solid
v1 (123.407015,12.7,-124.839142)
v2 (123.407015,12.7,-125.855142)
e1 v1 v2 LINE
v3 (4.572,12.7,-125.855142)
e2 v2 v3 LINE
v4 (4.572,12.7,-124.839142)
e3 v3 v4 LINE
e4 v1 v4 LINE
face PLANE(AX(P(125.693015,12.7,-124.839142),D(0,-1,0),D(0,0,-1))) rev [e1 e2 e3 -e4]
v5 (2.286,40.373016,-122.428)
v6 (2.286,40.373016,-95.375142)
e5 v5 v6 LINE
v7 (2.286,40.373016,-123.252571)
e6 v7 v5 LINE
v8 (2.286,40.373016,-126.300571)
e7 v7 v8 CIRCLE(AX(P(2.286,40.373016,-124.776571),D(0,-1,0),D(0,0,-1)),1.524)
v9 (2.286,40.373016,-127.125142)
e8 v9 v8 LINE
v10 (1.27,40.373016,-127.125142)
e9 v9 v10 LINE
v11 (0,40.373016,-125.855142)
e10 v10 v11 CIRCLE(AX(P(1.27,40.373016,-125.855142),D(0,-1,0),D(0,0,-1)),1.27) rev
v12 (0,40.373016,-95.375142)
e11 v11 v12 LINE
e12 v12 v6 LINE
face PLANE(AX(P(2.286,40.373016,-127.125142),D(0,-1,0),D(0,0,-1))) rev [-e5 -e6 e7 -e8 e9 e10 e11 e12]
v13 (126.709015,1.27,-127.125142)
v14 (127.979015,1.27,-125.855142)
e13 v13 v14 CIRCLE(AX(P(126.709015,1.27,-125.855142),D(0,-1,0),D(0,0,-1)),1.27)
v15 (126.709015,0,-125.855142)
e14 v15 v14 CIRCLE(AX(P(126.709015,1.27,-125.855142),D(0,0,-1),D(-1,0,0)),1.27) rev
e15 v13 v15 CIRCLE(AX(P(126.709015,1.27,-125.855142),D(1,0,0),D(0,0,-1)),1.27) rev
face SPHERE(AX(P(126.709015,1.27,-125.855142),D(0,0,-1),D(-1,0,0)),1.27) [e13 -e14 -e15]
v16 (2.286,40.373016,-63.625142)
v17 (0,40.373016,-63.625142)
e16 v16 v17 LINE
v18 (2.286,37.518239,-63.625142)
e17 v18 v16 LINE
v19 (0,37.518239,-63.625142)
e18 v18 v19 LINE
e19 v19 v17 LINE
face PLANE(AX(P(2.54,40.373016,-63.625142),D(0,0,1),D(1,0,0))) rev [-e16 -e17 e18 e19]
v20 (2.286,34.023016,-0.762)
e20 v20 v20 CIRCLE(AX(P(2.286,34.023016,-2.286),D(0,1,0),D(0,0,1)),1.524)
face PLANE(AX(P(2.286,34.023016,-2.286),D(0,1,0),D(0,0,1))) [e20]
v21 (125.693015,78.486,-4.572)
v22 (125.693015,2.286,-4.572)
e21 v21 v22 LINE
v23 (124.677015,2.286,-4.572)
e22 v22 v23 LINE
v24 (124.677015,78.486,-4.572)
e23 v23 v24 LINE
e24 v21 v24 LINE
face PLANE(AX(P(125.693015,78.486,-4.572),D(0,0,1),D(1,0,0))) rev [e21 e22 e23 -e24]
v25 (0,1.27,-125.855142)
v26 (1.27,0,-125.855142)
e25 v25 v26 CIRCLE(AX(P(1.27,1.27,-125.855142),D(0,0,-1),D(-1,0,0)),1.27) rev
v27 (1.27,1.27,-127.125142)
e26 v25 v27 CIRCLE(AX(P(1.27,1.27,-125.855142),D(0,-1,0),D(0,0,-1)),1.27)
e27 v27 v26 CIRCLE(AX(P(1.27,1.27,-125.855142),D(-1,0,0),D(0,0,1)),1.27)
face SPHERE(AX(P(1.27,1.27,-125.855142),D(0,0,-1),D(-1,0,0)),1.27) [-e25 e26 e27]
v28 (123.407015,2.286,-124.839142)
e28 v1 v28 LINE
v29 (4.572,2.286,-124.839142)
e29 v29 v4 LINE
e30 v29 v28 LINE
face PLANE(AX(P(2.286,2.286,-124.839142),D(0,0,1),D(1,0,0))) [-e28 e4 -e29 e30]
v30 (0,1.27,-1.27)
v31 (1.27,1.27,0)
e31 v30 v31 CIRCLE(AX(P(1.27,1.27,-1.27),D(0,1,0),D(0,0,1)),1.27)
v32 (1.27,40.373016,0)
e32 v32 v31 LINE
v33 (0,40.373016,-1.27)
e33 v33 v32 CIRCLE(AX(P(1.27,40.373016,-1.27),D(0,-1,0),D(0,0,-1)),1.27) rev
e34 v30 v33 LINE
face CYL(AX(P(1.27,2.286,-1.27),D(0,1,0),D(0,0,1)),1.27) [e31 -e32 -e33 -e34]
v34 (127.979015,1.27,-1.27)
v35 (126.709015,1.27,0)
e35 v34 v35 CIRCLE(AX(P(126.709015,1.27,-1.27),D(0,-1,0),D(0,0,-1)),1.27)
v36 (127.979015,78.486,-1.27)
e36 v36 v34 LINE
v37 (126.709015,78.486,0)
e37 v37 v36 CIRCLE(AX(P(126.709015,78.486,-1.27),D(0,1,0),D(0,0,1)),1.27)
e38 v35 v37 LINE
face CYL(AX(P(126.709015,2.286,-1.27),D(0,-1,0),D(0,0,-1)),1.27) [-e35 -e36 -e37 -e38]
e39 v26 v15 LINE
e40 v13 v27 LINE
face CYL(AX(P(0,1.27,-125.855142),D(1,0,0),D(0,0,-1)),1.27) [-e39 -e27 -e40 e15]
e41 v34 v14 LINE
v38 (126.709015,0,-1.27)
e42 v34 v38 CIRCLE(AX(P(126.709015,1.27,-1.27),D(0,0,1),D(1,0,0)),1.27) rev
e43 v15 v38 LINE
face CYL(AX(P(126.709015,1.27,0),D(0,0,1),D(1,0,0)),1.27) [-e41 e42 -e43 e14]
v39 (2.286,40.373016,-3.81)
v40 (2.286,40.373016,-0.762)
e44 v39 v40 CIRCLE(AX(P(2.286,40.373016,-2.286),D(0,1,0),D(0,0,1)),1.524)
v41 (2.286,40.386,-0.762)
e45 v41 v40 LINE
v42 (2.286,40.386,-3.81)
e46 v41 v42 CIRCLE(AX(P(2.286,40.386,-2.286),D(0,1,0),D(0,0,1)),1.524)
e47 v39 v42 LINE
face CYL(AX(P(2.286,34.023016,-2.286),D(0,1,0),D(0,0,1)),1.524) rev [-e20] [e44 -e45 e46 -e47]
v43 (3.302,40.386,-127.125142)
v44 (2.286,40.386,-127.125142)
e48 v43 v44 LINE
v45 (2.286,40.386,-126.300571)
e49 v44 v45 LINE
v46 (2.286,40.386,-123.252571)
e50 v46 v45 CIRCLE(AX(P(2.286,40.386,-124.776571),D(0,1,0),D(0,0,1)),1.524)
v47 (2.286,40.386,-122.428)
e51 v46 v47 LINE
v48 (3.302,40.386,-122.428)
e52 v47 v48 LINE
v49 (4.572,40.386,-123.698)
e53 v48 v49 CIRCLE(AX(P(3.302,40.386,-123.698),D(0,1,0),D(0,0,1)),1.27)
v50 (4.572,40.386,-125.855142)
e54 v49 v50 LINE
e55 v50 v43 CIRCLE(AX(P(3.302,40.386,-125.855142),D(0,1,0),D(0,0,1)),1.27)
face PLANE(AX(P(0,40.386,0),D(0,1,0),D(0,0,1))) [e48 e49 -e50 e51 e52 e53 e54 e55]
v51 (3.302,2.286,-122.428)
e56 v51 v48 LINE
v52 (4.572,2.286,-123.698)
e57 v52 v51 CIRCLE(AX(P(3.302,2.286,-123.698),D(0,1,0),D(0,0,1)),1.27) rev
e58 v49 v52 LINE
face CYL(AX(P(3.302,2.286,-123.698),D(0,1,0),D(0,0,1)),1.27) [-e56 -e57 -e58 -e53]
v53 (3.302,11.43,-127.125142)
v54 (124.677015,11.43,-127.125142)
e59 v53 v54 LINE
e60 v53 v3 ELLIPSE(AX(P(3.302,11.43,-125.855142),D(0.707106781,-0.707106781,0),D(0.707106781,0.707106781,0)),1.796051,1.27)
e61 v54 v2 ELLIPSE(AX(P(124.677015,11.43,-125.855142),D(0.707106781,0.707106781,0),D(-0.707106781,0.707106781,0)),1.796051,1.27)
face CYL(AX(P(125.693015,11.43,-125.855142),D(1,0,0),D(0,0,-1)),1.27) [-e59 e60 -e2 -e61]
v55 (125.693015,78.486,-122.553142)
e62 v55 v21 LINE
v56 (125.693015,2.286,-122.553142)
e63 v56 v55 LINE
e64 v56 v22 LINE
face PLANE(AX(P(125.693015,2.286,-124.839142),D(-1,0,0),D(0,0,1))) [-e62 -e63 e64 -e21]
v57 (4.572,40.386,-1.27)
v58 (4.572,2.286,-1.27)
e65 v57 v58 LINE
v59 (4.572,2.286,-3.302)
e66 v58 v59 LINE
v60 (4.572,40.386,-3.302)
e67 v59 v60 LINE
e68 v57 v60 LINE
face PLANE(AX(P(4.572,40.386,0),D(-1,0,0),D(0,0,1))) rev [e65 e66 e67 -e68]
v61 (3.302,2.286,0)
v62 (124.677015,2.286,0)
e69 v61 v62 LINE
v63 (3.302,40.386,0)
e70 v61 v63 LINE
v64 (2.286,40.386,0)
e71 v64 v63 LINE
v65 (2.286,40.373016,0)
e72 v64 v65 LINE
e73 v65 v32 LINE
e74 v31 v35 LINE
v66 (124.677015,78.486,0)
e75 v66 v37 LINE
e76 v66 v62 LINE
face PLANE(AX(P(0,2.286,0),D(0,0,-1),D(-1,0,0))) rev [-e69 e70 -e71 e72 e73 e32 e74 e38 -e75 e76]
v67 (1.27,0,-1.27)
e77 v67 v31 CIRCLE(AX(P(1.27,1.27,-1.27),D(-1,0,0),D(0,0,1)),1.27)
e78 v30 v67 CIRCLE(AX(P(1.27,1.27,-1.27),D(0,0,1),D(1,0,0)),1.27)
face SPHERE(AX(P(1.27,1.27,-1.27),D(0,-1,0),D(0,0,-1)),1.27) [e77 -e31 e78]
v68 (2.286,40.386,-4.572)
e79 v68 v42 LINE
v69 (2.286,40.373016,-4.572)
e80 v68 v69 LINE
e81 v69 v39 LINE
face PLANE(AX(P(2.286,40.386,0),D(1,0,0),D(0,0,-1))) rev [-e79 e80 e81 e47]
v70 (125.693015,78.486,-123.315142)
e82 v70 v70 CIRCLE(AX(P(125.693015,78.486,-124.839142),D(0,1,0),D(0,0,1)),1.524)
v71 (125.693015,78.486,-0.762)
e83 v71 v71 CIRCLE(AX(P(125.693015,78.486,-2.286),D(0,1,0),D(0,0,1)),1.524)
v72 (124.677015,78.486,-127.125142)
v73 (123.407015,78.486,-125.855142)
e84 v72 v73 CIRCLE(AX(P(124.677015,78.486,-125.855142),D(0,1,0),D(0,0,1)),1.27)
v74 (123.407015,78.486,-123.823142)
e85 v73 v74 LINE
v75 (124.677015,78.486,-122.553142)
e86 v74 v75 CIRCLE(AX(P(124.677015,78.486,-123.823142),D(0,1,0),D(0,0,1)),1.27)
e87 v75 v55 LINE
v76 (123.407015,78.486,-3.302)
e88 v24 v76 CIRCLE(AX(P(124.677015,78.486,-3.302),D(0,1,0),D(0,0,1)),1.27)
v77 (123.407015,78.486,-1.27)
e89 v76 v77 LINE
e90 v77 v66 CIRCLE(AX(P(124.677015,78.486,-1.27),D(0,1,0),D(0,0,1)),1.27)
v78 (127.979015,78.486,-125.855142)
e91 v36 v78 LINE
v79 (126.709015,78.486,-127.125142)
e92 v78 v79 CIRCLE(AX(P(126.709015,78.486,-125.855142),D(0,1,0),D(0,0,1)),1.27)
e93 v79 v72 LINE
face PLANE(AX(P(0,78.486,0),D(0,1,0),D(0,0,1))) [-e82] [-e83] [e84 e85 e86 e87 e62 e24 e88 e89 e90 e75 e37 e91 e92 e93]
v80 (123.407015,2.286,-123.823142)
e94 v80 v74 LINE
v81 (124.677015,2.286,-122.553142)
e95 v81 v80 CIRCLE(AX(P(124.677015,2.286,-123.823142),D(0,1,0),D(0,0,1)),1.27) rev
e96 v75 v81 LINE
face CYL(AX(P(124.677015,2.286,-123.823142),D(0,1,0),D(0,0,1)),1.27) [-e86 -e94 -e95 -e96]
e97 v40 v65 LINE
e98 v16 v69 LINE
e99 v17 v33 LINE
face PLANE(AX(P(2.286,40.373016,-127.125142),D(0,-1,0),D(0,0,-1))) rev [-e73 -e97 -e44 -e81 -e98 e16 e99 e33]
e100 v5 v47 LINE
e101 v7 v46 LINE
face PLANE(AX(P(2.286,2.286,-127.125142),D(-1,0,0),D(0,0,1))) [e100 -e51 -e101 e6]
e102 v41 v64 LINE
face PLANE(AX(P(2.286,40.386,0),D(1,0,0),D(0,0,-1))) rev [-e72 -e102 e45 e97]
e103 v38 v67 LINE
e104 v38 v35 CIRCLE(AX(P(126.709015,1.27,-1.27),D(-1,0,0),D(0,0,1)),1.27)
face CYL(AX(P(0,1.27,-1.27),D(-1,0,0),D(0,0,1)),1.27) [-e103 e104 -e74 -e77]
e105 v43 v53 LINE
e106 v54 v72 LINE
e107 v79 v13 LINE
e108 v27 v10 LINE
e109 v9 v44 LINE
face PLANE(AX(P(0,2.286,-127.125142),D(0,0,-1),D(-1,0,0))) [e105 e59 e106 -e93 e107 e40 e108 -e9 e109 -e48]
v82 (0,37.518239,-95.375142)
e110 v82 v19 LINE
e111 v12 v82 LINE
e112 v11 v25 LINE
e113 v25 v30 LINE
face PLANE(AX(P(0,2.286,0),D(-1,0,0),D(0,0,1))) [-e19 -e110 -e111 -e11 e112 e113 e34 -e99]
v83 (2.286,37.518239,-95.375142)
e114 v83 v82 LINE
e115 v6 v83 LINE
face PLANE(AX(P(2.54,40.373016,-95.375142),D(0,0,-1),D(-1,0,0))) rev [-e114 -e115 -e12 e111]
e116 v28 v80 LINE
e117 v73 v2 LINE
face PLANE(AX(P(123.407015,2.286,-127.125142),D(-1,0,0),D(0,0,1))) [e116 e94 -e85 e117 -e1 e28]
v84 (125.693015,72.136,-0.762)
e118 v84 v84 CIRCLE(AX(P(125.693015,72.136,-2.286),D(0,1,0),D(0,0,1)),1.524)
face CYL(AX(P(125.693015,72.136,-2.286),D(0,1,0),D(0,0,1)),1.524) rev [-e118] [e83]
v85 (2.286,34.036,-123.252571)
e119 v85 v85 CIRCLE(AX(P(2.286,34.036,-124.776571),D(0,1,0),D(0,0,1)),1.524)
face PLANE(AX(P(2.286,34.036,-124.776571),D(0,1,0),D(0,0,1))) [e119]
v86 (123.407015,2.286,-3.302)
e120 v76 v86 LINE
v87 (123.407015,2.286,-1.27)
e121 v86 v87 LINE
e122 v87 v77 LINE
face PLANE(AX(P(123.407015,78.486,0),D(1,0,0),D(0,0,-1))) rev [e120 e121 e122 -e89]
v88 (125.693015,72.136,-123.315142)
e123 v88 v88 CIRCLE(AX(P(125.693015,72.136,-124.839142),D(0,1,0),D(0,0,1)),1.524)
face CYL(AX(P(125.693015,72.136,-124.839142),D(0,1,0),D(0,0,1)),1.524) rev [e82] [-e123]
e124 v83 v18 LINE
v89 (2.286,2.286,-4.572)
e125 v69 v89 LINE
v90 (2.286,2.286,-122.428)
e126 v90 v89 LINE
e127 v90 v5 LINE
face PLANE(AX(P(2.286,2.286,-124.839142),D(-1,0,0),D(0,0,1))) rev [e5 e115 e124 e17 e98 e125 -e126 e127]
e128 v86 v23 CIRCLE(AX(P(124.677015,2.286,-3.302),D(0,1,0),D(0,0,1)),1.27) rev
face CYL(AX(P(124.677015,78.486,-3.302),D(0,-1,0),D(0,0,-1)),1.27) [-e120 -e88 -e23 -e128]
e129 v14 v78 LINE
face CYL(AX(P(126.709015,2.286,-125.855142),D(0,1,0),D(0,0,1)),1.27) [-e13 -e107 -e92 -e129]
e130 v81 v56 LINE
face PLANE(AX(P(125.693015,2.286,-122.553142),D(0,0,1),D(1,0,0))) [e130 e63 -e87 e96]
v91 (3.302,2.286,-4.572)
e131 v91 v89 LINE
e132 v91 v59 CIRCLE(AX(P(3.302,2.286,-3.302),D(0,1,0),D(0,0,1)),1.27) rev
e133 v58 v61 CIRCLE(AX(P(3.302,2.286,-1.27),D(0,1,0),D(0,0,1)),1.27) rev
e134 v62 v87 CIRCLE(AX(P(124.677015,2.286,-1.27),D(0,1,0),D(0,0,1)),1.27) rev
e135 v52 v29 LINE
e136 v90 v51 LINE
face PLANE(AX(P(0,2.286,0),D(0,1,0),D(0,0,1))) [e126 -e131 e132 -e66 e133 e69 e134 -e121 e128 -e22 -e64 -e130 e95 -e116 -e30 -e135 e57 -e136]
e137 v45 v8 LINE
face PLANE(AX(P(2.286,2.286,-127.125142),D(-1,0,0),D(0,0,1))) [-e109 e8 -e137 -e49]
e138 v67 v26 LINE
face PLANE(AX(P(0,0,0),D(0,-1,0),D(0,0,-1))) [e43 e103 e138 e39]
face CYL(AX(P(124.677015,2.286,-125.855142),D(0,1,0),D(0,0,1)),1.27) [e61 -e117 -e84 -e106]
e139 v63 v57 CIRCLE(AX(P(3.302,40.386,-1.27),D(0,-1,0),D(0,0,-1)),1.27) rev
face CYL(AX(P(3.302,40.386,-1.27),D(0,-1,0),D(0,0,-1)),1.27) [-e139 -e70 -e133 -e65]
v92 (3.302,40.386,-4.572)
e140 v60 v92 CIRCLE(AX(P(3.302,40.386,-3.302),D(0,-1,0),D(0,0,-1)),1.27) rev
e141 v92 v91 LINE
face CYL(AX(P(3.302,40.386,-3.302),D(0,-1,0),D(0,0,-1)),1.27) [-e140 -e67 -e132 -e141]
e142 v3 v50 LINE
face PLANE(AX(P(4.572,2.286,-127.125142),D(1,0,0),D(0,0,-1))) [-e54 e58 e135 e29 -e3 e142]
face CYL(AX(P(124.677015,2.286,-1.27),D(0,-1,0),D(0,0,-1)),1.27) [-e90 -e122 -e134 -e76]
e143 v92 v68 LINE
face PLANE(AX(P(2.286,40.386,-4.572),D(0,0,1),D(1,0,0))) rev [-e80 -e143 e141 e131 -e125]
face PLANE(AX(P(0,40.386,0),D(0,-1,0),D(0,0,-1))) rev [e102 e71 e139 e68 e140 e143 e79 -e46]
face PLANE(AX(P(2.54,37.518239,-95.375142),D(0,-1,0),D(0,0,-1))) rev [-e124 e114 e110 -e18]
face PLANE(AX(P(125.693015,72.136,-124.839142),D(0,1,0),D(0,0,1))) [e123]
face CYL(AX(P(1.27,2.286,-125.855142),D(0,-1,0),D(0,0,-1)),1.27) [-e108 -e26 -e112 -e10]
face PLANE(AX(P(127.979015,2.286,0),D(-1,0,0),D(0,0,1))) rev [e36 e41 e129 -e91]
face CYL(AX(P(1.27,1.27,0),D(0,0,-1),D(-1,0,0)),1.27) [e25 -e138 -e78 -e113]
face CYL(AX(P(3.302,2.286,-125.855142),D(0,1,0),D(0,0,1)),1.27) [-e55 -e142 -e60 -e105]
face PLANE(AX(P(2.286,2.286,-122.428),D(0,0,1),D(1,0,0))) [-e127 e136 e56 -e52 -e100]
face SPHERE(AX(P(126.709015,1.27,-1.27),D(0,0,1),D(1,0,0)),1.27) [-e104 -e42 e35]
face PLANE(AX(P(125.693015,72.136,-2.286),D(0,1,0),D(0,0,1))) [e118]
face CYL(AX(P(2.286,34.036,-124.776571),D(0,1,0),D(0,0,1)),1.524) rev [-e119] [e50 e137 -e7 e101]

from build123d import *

# Parameters (mm, degrees)
SKETCH1_W                = 127.979014886
SKETCH1_H                = 127.125142163
BOSS_EXTRUDE1_DEPTH      = 2.286
SKETCH2_W                = 127.979014886
SKETCH2_H                = 127.125142163
BOSS_EXTRUDE2_DEPTH      = 76.2
SKETCH4_W                = 123.407014886
SKETCH4_H                = 122.553142163
CUT_EXTRUDE2_DEPTH       = 76.2
SKETCH5_W                = 123.407014886
SKETCH5_H                = 76.2
CUT_EXTRUDE3_DEPTH       = 2.286
SKETCH6_W                = 123.407014886
SKETCH6_H                = 65.786
CUT_EXTRUDE4_DEPTH       = 2.286
SKETCH7_W                = 127.125142163
SKETCH7_H                = 38.112983868
CUT_EXTRUDE5_DEPTH       = 2.286
SKETCH8_W                = 31.75
SKETCH8_H                = 2.854777597
CUT_EXTRUDE6_DEPTH       = 2.54
SKETCH9_W                = 2.286
SKETCH9_H                = 4.572
BOSS_EXTRUDE3_DEPTH      = 76.2
SKETCH11_W               = 2.286
SKETCH11_H               = 4.572
BOSS_EXTRUDE5_DEPTH      = 38.1
BOSS_EXTRUDE6_DEPTH      = 27.686
BOSS_EXTRUDE6_DEPTH_BACK = 10.414
SKETCH12_W               = 2.286
SKETCH12_H               = 4.697142163
BOSS_EXTRUDE7_DEPTH      = 65.786
BOSS_EXTRUDE7_DEPTH_BACK = 10.414
SKETCH13_W               = 2.286
SKETCH13_H               = 4.572
SKETCH14_R               = 1.524
CUT_EXTRUDE7_DEPTH       = 6.35
SKETCH15_R               = 1.524
CUT_EXTRUDE8_DEPTH       = 6.35
SKETCH16_R               = 1.524
CUT_EXTRUDE9_DEPTH       = 6.35
SKETCH18_R               = 1.524
CUT_EXTRUDE10_DEPTH      = 6.35
SKETCH19_R               = 1.524
CUT_EXTRUDE11_DEPTH      = 6.35
FILLET1_R                = 1.27
FILLET2_R                = 1.27
FILLET7_R                = 1.27
FILLET8_R                = 1.27


with BuildPart() as part:
    # Sketch1 → Boss-Extrude1 (new body)
    with BuildSketch(Plane(origin=(0, 0, 0), x_dir=(1, 0, 0), z_dir=(0, 1, 0))):
        with Locations((63.989507443, 63.562571082)):
            Rectangle(SKETCH1_W, SKETCH1_H)
    extrude(amount=BOSS_EXTRUDE1_DEPTH)

    # Sketch2 → Boss-Extrude2 (add)
    with BuildSketch(Plane(origin=(0, 2.286, 0), x_dir=(1, 0, 0), z_dir=(0, 1, 0))):
        with Locations((63.989507443, 63.562571082)):
            Rectangle(SKETCH2_W, SKETCH2_H)
    extrude(amount=BOSS_EXTRUDE2_DEPTH)

    # Sketch4 → Cut-Extrude2 (cut)
    with BuildSketch(Plane(origin=(0, 78.486, 0), x_dir=(1, 0, 0), z_dir=(0, 1, 0))):
        with Locations((63.989507443, 63.562571082)):
            Rectangle(SKETCH4_W, SKETCH4_H)
    extrude(amount=-CUT_EXTRUDE2_DEPTH, mode=Mode.SUBTRACT)

    # Sketch5 → Cut-Extrude3 (cut)
    with BuildSketch(Plane.XY):
        with Locations((63.989507443, 40.386)):
            Rectangle(SKETCH5_W, SKETCH5_H)
    extrude(amount=-CUT_EXTRUDE3_DEPTH, mode=Mode.SUBTRACT)

    # Sketch6 → Cut-Extrude4 (cut)
    with BuildSketch(Plane(origin=(0, 0, -127.125142163), x_dir=(-1, 0, 0), z_dir=(0, 0, -1))):
        with Locations((-63.989507443, 45.593)):
            Rectangle(SKETCH6_W, SKETCH6_H)
    extrude(amount=-CUT_EXTRUDE4_DEPTH, mode=Mode.SUBTRACT)

    # Sketch7 → Cut-Extrude5 (cut)
    with BuildSketch(Plane.ZY):
        with Locations((-63.562571082, 59.429508066)):
            Rectangle(SKETCH7_W, SKETCH7_H)
    extrude(amount=-CUT_EXTRUDE5_DEPTH, mode=Mode.SUBTRACT)

    # Sketch8 → Cut-Extrude6 (cut)
    with BuildSketch(Plane.ZY):
        with Locations((-79.500142163, 38.945627333)):
            Rectangle(SKETCH8_W, SKETCH8_H)
    extrude(amount=-CUT_EXTRUDE6_DEPTH, mode=Mode.SUBTRACT)

    # Sketch9 → Boss-Extrude3 (add)
    with BuildSketch(Plane(origin=(0, 2.286, 0), x_dir=(1, 0, 0), z_dir=(0, 1, 0))):
        with Locations((124.550014886, 2.286)):
            Rectangle(SKETCH9_W, SKETCH9_H)
    extrude(amount=BOSS_EXTRUDE3_DEPTH)

    # Sketch11 → Boss-Extrude5 (add)
    with BuildSketch(Plane(origin=(0, 2.286, 0), x_dir=(1, 0, 0), z_dir=(0, 1, 0))):
        with Locations((3.429, 2.286)):
            Rectangle(SKETCH11_W, SKETCH11_H)
    extrude(amount=BOSS_EXTRUDE5_DEPTH)

    # Sketch12 → Boss-Extrude6 (add, two sides: drawn at the far end of the back side and taken through both)
    with BuildSketch(Plane(origin=(0, 12.7, 0), x_dir=(1, 0, 0), z_dir=(0, 1, 0)).offset(-BOSS_EXTRUDE6_DEPTH_BACK)):
        with Locations((3.429, 124.776571082)):
            Rectangle(SKETCH12_W, SKETCH12_H)
    extrude(amount=BOSS_EXTRUDE6_DEPTH + BOSS_EXTRUDE6_DEPTH_BACK)

    # Sketch13 → Boss-Extrude7 (add, two sides: drawn at the far end of the back side and taken through both)
    with BuildSketch(Plane(origin=(0, 12.7, 0), x_dir=(1, 0, 0), z_dir=(0, 1, 0)).offset(-BOSS_EXTRUDE7_DEPTH_BACK)):
        with Locations((124.550014886, 124.839142163)):
            Rectangle(SKETCH13_W, SKETCH13_H)
    extrude(amount=BOSS_EXTRUDE7_DEPTH + BOSS_EXTRUDE7_DEPTH_BACK)

    # Sketch14 → Cut-Extrude7 (cut)
    with BuildSketch(Plane(origin=(0, 78.486, 0), x_dir=(1, 0, 0), z_dir=(0, 1, 0))):
        with Locations(Location((125.693014886, 2.286, 0), (0, 0, 270))):
            Circle(SKETCH14_R)
    extrude(amount=-CUT_EXTRUDE7_DEPTH, mode=Mode.SUBTRACT)

    # Sketch15 → Cut-Extrude8 (cut)
    with BuildSketch(Plane(origin=(0, 78.486, 0), x_dir=(1, 0, 0), z_dir=(0, 1, 0))):
        with Locations(Location((125.693014886, 124.839142163, 0), (0, 0, 270))):
            Circle(SKETCH15_R)
    extrude(amount=-CUT_EXTRUDE8_DEPTH, mode=Mode.SUBTRACT)

    # Sketch16 → Cut-Extrude9 (cut)
    with BuildSketch(Plane(origin=(0, 40.373016132, 0), x_dir=(1, 0, 0), z_dir=(0, 1, 0))):
        with Locations(Location((2.286, 2.286, 0), (0, 0, 270))):
            Circle(SKETCH16_R)
    extrude(amount=-CUT_EXTRUDE9_DEPTH, mode=Mode.SUBTRACT)

    # Sketch18 → Cut-Extrude10 (cut)
    with BuildSketch(Plane(origin=(0, 40.386, 0), x_dir=(1, 0, 0), z_dir=(0, 1, 0))):
        with Locations(Location((2.286, 2.286, 0), (0, 0, 270))):
            Circle(SKETCH18_R)
    extrude(amount=-CUT_EXTRUDE10_DEPTH, mode=Mode.SUBTRACT)

    # Sketch19 → Cut-Extrude11 (cut)
    with BuildSketch(Plane(origin=(0, 40.386, 0), x_dir=(1, 0, 0), z_dir=(0, 1, 0))):
        with Locations(Location((2.286, 124.776571082, 0), (0, 0, 270))):
            Circle(SKETCH19_R)
    extrude(amount=-CUT_EXTRUDE11_DEPTH, mode=Mode.SUBTRACT)

    # Fillet1
    fillet1_edges = [part.edges().sort_by_distance(p)[0] for p in [
        (0, 20.186508066, 0),
    ]]
    fillet(fillet1_edges, radius=FILLET1_R)

    # Fillet2
    fillet2_edges = [part.edges().sort_by_distance(p)[0] for p in [
        (4.572, 21.336, 0),
        (4.572, 21.336, -4.572),
        (4.572, 26.543, -127.125142163),
        (63.989507443, 12.7, -127.125142163),
        (123.407014886, 45.593, -127.125142163),
        (64.624507443, 0, 0),
        (0, 0, -64.197571082),
        (0.371974388, 0, -0.371974388),
        (127.979014886, 0, -63.562571082),
        (63.989507443, 0, -127.125142163),
        (0, 20.186508066, -127.125142163),
        (127.979014886, 39.243, -127.125142163),
    ]]
    fillet(fillet2_edges, radius=FILLET2_R)

    # Fillet7
    fillet7_edges = [part.edges().sort_by_distance(p)[0] for p in [
        (4.572, 21.336, -122.428),
    ]]
    fillet(fillet7_edges, radius=FILLET7_R)

    # Fillet8
    # the kernel refuses this fillet: 1.27 mm, written as the material it takes off along each edge
    with BuildSketch(Plane(origin=(126.709014886, 1.27, -1.27), x_dir=(1, 0, 0), z_dir=(0, 0, 1))) as fillet8_piece_1_section:
        Polygon((0, 0), (FILLET8_R, 0), (FILLET8_R, -FILLET8_R), (0, -FILLET8_R), align=None)
    fillet8_piece_1 = extrude(amount=FILLET8_R, mode=Mode.PRIVATE)
    fillet8_piece_1 = fillet8_piece_1 - Plane(origin=(126.709014886, 1.27, -1.27), x_dir=(-0.7071067811865475, 0.7071067811865475, 0), z_dir=(0, 0, 1)) * Sphere(FILLET8_R, mode=Mode.PRIVATE)
    add(fillet8_piece_1, mode=Mode.SUBTRACT)
    with BuildSketch(Plane(origin=(123.407014886, 2.286, -4.572), x_dir=(1, 0, 0), z_dir=(0, 1, 0)), Plane(origin=(123.407014886, 2.286, 0), x_dir=(0, 0, -1), z_dir=(0, 1, 0)), Plane(origin=(123.407014886, 2.286, -122.553142163), x_dir=(0, 0, -1), z_dir=(0, 1, 0))) as fillet8_piece_2:
        with BuildLine():
            CenterArc((FILLET8_R, -FILLET8_R), FILLET8_R, 90, 90)
            Line((0, -FILLET8_R), (0, 0))
            Line((0, 0), (FILLET8_R, 0))
        make_face()
    extrude(amount=79.375, mode=Mode.SUBTRACT)
    with BuildSketch(Plane(origin=(127.979014886, 1.27, 0), x_dir=(-1, 0, 0), z_dir=(0, 1, 0))) as fillet8_piece_3:
        with BuildLine():
            CenterArc((FILLET8_R, -FILLET8_R), FILLET8_R, 90, 90)
            Line((0, -FILLET8_R), (0, 0))
            Line((0, 0), (FILLET8_R, 0))
        make_face()
    extrude(amount=80.391, mode=Mode.SUBTRACT)


solid = part.part
